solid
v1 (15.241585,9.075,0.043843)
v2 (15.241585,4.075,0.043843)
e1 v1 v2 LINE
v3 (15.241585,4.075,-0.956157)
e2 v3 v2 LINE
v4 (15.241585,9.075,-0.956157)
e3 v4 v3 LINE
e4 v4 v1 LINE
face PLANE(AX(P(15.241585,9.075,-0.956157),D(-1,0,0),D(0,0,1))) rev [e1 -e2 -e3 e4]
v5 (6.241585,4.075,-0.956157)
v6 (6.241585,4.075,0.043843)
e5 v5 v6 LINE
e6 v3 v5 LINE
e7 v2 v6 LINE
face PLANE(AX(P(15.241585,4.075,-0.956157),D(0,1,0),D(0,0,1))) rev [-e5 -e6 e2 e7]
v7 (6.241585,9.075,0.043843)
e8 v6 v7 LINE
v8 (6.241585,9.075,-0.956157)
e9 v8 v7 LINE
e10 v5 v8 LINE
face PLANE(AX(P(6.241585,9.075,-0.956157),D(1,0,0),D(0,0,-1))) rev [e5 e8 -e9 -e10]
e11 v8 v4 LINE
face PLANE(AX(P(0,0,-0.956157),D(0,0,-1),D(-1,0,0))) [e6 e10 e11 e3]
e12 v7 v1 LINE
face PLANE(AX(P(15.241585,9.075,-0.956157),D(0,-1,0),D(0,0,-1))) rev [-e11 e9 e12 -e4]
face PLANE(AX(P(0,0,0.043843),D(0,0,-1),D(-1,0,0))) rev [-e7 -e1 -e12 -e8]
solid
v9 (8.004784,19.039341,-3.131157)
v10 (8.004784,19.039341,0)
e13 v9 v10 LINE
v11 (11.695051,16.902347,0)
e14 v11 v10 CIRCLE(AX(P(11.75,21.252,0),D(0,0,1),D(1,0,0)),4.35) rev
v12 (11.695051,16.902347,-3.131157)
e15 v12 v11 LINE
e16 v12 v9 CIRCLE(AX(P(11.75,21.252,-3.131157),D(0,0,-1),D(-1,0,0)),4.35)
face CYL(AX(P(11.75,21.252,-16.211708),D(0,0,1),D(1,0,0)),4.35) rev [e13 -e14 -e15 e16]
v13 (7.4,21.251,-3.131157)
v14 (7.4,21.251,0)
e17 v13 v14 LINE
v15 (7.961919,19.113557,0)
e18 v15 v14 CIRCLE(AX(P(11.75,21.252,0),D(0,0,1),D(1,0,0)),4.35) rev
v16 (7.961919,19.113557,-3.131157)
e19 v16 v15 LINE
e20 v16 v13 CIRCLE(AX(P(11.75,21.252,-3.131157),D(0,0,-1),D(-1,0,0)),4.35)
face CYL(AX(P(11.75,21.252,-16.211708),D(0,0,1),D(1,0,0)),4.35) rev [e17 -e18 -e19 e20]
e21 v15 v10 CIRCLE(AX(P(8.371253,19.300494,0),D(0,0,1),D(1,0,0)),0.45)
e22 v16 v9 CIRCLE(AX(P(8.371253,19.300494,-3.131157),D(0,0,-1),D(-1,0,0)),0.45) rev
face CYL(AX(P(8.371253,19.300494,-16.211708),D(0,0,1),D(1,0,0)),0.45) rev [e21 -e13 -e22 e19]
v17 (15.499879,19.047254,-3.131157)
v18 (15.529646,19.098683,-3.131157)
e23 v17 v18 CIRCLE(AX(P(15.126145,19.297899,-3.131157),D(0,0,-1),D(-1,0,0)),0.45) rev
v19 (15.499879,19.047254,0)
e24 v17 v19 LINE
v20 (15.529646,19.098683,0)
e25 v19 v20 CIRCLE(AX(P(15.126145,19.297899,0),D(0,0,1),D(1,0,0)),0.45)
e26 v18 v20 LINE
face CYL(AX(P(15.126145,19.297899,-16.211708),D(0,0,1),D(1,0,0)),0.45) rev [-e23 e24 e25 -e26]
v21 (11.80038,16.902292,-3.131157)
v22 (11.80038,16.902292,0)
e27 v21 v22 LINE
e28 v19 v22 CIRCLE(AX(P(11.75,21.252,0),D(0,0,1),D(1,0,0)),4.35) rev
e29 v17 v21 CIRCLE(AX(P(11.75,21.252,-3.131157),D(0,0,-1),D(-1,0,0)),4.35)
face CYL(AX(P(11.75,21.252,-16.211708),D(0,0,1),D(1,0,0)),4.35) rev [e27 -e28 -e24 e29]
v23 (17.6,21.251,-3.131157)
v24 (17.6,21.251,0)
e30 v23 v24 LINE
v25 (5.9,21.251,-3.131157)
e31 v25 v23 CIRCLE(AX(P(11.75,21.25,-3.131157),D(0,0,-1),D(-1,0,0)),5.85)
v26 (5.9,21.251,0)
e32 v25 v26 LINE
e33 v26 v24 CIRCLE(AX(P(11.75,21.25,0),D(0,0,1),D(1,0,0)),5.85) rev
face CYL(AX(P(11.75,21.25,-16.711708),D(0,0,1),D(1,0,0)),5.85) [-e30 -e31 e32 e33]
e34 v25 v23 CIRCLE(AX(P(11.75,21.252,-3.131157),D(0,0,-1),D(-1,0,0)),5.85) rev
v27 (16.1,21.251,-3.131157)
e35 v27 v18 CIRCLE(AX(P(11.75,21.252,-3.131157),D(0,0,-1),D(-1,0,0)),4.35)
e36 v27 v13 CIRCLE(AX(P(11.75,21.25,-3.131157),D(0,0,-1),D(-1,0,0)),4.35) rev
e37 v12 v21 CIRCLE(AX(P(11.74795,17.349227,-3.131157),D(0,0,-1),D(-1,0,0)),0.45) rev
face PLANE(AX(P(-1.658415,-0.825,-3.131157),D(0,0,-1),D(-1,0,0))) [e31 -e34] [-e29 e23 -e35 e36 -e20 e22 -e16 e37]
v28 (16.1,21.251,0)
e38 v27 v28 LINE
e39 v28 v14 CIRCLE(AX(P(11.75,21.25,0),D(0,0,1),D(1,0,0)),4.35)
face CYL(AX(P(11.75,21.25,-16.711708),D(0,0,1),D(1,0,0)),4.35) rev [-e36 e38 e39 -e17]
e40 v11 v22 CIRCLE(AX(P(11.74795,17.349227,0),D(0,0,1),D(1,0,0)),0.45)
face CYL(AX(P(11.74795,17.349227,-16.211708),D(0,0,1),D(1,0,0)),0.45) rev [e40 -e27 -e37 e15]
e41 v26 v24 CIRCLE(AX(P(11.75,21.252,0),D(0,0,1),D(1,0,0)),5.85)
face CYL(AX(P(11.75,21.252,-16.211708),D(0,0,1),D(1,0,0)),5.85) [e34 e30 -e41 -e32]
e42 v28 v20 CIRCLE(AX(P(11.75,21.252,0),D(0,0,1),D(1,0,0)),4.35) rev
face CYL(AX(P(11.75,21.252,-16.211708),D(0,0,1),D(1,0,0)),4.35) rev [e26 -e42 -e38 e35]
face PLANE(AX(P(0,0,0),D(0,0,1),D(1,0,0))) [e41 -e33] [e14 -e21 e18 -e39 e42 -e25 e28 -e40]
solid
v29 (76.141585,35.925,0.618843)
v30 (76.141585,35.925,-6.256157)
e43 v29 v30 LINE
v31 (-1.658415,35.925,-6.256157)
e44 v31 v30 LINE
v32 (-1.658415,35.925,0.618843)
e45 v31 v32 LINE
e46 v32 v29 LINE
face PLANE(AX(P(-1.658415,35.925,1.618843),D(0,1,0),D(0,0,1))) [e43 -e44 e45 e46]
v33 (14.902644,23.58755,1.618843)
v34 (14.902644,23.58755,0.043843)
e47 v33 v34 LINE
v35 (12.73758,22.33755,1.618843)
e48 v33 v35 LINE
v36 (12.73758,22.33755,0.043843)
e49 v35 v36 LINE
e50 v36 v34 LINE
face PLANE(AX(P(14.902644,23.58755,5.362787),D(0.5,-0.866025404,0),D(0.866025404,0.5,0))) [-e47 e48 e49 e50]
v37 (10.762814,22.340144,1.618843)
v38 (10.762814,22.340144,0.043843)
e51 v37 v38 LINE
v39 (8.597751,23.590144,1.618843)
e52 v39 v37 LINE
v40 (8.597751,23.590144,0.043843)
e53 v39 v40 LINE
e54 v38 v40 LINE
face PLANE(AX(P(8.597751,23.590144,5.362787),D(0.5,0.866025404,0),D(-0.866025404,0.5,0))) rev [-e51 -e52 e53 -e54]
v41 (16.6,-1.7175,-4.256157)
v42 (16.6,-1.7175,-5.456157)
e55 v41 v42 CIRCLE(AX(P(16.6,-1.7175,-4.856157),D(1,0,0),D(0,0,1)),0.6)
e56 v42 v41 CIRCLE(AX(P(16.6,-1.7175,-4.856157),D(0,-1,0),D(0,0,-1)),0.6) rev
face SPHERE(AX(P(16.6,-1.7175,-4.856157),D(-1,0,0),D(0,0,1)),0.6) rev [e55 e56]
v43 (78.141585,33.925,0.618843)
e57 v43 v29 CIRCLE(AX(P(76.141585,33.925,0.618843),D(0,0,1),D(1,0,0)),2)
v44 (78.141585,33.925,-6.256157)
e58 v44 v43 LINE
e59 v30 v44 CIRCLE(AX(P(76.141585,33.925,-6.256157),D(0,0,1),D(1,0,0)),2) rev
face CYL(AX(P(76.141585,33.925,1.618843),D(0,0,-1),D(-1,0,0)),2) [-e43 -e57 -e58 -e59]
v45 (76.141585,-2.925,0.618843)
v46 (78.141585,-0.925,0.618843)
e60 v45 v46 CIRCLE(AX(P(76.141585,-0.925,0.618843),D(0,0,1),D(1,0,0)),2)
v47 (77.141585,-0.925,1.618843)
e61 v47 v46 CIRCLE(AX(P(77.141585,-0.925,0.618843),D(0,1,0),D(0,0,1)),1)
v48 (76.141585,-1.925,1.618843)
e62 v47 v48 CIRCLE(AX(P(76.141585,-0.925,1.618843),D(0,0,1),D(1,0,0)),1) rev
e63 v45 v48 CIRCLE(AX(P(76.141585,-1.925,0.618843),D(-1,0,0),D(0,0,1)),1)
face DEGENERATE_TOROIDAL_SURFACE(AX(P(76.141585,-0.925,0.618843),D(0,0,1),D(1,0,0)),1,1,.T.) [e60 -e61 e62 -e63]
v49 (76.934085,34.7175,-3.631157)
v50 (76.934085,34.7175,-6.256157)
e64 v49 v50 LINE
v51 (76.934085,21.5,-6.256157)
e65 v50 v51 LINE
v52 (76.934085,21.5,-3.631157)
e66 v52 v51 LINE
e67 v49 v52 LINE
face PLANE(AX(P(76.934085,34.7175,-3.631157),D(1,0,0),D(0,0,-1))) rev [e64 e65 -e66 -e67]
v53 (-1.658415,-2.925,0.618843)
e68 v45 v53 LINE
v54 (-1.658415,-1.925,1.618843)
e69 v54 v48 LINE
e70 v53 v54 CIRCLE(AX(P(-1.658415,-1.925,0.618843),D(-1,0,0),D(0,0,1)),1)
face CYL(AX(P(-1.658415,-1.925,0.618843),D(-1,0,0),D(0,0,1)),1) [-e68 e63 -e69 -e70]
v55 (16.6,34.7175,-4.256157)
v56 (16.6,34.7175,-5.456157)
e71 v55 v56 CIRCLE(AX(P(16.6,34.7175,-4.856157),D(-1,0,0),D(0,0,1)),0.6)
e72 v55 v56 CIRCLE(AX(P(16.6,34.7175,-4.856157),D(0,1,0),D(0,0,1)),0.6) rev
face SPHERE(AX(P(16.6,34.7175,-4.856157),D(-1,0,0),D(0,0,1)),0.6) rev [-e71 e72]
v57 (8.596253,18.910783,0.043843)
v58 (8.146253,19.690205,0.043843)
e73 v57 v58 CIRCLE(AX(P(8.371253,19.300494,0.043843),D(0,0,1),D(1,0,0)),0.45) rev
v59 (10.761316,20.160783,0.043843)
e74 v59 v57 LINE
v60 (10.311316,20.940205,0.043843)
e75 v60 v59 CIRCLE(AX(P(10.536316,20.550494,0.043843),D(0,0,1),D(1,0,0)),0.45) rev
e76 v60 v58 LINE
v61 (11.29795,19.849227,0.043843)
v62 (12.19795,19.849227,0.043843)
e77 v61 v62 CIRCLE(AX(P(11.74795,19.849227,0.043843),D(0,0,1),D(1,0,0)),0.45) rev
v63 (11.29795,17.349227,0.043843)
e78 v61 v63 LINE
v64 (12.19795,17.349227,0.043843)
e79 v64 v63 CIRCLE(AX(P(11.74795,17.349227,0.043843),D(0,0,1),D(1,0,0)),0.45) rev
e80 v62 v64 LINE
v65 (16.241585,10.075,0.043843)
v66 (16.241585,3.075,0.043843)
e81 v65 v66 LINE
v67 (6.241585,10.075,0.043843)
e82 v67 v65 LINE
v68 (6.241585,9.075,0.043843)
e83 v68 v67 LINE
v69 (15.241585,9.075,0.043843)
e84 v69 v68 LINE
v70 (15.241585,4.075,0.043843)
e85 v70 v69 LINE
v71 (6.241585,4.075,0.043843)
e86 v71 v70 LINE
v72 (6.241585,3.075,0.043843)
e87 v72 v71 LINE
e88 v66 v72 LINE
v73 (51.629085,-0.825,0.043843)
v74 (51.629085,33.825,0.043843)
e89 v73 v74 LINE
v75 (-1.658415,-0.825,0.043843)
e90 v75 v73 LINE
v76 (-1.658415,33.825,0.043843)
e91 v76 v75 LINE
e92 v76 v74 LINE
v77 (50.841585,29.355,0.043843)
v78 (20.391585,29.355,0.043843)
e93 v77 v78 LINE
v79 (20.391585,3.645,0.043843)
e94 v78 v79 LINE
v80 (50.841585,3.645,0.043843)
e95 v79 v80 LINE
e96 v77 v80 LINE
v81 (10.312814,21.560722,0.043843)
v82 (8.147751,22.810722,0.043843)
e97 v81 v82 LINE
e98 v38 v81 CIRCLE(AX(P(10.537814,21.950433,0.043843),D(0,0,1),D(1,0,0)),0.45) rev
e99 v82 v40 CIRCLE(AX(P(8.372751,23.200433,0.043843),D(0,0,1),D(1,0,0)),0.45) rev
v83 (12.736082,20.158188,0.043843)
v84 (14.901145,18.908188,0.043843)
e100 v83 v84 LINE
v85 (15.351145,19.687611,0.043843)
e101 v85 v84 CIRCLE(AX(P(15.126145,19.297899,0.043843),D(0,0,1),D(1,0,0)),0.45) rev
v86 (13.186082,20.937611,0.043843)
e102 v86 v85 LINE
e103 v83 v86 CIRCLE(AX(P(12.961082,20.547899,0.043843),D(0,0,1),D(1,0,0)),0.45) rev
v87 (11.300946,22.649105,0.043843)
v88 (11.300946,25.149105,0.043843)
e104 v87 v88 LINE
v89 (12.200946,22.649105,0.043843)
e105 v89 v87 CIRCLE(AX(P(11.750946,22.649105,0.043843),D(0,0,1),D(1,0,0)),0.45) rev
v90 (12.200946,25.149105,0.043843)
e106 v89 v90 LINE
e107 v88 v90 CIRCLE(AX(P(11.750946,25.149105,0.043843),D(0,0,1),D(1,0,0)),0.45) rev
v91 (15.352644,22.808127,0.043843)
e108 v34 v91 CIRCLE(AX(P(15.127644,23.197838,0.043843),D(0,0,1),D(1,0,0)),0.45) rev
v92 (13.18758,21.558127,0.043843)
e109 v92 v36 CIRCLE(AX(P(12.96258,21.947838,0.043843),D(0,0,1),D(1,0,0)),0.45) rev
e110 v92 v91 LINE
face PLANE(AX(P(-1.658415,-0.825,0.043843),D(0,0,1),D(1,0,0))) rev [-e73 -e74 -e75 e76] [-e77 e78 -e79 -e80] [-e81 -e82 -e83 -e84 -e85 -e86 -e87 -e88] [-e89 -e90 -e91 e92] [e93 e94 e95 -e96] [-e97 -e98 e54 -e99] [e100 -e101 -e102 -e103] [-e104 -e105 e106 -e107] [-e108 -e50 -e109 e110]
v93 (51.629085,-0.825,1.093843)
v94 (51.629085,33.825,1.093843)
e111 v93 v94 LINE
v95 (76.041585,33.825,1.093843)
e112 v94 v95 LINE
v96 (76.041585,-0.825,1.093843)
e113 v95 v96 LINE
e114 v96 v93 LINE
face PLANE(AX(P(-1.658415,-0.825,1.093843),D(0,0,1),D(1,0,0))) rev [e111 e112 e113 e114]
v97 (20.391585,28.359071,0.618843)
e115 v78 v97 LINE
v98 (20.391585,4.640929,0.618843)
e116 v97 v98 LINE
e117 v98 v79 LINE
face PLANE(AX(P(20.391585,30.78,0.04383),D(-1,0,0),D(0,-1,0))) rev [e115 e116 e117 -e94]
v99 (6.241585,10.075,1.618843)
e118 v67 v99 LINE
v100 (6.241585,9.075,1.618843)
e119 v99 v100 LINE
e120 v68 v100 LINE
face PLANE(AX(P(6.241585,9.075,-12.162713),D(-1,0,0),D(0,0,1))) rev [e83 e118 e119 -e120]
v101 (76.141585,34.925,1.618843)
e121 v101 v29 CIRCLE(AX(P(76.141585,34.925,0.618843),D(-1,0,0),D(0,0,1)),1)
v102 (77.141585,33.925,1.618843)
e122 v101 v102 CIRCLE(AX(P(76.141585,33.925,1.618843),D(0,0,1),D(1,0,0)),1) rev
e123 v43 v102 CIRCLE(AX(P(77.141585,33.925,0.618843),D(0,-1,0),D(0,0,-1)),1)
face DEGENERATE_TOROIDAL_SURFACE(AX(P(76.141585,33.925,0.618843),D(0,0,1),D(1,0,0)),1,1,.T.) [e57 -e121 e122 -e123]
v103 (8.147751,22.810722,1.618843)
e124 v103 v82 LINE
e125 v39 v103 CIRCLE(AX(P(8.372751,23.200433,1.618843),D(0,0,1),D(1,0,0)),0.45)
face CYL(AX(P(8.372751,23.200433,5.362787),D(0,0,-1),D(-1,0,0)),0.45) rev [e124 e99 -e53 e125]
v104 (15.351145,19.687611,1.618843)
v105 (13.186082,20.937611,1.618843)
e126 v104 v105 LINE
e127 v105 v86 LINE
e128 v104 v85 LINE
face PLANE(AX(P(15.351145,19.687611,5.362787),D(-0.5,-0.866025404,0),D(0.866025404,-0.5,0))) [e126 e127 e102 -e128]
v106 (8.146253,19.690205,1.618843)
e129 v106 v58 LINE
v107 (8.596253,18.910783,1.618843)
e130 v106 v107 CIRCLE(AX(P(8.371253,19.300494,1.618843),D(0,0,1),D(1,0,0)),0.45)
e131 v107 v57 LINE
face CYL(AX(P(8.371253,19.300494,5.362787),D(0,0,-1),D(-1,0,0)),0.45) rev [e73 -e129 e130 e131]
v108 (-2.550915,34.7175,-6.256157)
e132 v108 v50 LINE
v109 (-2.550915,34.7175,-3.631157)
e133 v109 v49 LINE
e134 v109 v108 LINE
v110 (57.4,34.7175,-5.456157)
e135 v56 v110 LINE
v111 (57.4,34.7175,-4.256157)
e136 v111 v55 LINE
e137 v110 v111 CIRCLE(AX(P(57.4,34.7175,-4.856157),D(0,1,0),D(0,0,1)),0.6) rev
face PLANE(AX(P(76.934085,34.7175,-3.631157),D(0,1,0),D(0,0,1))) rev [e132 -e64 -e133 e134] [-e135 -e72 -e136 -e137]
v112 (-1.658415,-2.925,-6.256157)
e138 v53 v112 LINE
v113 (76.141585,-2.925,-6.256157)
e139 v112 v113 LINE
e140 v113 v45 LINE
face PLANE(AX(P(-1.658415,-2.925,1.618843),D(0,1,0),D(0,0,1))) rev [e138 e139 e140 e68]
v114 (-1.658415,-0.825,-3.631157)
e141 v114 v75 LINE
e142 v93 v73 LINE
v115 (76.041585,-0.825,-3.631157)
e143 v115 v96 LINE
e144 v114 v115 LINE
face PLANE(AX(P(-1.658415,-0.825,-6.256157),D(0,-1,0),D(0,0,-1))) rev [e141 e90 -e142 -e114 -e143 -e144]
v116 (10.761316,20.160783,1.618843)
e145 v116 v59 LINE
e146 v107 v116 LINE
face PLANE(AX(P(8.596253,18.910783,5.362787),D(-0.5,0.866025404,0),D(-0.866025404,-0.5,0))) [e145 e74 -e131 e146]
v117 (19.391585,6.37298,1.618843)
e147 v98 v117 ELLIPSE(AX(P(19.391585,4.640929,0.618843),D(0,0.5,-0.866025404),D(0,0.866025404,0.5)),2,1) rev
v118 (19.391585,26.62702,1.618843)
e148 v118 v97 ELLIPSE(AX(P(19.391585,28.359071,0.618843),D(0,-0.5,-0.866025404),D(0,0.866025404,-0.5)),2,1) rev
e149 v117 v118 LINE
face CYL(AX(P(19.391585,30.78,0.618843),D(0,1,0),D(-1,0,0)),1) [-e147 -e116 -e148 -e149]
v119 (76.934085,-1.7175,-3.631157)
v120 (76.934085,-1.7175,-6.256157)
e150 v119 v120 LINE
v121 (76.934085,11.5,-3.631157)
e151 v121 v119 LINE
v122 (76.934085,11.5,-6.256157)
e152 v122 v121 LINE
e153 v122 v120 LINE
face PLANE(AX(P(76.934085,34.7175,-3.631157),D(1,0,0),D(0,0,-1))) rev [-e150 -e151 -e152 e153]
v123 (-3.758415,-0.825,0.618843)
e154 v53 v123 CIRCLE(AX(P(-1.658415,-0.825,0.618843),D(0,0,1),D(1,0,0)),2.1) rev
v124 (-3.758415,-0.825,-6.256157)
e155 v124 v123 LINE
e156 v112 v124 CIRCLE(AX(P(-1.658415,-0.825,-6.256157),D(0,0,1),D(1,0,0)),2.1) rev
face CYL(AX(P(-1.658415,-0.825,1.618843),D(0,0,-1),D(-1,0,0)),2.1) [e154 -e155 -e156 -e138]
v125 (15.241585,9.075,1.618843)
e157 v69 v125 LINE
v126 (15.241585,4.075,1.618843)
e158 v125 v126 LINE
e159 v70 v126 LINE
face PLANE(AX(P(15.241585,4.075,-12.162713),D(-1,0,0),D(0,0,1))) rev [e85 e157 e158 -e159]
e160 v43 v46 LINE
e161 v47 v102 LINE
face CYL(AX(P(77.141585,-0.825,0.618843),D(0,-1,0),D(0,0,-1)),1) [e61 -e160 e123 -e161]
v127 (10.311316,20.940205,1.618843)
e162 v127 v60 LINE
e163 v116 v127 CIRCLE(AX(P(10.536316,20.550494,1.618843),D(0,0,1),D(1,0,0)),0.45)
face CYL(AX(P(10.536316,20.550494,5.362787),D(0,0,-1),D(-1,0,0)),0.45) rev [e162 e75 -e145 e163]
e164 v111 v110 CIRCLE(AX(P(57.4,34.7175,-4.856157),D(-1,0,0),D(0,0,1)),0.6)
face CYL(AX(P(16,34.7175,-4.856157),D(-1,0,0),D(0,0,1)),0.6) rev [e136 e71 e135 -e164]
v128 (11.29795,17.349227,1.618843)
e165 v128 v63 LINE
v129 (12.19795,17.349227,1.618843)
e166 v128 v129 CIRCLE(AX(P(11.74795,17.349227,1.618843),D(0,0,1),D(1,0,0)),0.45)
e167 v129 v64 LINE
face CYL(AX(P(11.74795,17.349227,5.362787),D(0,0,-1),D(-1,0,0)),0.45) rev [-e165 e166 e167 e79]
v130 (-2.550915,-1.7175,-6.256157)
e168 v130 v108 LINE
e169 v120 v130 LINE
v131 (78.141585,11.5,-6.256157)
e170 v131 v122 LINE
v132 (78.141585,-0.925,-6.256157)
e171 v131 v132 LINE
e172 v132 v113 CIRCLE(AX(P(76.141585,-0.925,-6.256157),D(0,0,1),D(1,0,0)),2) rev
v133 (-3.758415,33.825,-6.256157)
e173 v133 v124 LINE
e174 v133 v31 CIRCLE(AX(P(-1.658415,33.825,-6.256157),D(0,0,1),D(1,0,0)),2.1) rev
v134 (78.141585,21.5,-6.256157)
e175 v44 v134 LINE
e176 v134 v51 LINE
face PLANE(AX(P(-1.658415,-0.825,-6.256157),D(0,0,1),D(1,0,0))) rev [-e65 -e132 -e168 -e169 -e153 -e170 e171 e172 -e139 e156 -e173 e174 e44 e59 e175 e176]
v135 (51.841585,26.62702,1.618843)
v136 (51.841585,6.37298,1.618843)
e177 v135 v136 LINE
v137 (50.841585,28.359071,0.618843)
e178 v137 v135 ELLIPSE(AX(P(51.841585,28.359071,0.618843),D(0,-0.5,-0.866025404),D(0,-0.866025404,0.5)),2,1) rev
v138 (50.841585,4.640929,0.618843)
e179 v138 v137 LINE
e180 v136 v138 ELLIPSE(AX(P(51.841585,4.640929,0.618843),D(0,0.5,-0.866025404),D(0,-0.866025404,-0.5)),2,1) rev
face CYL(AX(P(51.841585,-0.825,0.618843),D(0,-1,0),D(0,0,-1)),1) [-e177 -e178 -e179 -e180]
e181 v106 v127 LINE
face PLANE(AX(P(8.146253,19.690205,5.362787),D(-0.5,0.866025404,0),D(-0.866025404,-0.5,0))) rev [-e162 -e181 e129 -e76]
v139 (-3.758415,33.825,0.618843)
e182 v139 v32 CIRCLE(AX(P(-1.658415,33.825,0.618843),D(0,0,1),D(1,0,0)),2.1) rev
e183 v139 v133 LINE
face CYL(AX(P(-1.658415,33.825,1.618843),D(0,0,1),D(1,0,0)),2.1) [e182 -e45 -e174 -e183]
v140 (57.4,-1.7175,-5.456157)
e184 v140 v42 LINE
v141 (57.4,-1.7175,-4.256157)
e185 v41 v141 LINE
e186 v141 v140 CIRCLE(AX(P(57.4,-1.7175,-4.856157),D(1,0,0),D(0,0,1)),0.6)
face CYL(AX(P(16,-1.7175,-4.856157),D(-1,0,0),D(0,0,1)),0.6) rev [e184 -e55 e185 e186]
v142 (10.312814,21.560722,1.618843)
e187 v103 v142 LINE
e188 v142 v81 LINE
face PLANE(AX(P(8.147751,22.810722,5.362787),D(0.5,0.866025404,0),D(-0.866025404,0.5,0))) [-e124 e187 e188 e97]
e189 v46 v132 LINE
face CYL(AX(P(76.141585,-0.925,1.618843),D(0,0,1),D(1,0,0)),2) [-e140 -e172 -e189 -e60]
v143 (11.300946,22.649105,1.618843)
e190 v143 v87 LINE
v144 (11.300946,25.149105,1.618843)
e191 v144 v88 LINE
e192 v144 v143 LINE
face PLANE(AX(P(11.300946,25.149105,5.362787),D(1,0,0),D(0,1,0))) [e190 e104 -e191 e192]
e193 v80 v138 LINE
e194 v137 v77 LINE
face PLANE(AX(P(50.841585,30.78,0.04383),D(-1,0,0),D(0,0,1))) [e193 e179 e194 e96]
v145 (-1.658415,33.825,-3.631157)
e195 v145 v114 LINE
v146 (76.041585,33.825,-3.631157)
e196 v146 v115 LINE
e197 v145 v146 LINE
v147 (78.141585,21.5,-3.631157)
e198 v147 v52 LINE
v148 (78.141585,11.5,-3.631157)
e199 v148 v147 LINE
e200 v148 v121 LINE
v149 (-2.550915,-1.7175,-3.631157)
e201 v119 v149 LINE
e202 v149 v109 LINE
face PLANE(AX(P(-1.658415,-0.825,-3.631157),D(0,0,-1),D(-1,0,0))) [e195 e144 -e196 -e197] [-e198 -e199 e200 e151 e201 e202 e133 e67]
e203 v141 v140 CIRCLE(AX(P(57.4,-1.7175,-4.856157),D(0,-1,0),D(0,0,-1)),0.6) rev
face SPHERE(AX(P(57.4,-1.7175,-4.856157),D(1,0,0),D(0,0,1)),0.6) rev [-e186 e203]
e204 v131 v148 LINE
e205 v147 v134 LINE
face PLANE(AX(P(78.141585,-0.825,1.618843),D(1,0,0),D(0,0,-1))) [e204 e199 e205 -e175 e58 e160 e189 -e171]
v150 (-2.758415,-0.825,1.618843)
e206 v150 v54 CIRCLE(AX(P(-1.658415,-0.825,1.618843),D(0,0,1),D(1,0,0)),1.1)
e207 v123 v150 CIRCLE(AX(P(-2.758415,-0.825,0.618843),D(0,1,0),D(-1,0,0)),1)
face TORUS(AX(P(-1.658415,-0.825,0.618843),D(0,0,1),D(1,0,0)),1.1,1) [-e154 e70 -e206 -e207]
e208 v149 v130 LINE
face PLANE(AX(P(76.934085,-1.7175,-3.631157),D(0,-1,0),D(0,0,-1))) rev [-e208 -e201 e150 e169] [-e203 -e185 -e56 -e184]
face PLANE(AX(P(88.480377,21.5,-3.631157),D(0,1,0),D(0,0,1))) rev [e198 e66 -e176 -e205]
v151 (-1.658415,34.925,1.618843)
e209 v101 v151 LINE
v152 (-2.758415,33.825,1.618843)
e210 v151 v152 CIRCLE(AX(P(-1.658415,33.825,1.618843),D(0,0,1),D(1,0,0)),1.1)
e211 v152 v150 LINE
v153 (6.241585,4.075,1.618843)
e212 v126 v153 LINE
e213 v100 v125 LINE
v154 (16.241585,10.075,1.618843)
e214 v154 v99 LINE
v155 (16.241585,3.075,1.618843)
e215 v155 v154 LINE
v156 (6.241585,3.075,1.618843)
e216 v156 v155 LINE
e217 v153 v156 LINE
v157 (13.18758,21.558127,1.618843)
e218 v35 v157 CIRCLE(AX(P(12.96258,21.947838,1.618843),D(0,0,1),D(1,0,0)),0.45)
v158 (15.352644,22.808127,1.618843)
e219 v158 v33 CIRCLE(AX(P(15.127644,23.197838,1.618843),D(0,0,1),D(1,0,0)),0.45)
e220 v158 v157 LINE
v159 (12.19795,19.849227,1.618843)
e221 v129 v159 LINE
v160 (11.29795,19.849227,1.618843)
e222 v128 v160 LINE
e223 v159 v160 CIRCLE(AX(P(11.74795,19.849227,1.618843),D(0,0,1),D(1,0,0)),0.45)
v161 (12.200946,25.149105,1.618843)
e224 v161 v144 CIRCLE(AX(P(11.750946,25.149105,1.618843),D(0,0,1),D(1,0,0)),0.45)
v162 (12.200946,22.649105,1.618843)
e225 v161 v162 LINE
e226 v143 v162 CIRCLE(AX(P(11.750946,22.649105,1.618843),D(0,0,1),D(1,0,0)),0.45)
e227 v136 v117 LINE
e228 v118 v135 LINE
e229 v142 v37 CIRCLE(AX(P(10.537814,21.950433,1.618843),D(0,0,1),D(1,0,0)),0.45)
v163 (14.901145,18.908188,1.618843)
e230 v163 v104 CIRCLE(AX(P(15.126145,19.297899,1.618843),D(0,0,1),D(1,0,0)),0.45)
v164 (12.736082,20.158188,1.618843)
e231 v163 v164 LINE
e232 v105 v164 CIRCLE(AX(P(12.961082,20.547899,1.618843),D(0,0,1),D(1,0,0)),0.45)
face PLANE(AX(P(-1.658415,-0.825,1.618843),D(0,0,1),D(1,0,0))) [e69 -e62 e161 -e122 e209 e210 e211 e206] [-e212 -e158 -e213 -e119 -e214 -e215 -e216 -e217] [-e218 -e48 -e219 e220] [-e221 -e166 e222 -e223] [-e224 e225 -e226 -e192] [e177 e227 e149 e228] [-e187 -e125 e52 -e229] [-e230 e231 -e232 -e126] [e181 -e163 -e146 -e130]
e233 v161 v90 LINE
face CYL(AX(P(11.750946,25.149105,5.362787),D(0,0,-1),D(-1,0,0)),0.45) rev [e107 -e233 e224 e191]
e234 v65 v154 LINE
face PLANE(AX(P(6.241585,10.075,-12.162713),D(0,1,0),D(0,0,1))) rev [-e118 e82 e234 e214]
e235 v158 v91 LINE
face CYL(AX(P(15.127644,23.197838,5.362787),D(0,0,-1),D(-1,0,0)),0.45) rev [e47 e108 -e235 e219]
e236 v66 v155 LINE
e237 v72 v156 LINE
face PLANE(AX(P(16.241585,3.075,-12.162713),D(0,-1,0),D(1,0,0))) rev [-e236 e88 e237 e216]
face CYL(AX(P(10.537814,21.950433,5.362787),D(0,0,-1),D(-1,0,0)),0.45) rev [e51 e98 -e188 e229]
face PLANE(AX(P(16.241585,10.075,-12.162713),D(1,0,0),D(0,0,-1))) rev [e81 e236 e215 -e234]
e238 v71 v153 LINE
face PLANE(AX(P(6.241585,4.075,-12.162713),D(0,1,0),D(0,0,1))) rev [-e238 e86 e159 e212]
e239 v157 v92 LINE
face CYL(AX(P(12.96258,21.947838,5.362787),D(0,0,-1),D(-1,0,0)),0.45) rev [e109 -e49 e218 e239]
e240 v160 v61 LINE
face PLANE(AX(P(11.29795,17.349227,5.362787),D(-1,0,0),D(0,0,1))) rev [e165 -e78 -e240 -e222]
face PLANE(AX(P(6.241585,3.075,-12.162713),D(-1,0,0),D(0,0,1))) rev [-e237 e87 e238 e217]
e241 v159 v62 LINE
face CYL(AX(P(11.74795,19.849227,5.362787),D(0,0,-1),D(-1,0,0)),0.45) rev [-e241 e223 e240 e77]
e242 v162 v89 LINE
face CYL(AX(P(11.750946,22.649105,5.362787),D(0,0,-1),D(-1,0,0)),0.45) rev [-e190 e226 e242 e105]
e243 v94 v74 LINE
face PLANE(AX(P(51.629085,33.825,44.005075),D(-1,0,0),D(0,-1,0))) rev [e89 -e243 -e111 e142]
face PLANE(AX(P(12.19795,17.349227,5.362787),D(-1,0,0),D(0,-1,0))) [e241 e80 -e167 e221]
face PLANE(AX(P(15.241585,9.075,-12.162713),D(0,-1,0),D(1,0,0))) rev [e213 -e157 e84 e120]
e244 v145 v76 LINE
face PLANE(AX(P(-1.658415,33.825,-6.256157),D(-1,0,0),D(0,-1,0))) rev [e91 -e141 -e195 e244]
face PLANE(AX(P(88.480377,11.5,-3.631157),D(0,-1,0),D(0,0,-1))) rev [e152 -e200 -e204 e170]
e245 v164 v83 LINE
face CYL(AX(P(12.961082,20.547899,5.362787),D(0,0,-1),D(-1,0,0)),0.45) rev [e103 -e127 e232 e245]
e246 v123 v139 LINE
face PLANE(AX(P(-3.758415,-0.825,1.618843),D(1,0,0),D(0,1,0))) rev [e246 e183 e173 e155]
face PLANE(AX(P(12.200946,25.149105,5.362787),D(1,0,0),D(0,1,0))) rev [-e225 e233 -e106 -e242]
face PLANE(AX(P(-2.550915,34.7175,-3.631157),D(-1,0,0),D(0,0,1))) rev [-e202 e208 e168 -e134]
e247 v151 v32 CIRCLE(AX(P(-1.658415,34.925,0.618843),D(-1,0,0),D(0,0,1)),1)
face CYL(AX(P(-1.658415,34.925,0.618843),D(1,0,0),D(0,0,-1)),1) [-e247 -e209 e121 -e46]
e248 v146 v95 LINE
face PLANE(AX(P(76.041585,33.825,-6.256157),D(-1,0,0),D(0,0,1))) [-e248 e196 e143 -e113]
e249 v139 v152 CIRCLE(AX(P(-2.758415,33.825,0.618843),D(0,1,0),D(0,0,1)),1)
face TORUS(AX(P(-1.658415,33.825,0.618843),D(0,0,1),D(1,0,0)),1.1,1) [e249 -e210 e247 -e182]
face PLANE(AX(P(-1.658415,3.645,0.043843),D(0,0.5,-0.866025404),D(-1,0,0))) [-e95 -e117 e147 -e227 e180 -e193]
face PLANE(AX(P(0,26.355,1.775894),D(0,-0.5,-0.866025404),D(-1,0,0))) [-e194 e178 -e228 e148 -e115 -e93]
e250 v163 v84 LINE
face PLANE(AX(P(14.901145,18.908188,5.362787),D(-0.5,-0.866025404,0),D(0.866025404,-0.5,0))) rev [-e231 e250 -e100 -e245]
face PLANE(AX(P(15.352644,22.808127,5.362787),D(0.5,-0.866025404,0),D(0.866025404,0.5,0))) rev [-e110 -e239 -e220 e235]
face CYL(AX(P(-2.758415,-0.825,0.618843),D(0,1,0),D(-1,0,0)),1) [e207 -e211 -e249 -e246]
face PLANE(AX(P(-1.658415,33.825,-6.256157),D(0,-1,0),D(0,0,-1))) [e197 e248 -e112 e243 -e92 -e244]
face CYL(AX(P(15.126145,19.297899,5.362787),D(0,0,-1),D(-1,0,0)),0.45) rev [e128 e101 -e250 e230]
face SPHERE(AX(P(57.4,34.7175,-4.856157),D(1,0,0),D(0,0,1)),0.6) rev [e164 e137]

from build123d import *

# Parameters (mm, degrees)
SKIZZE1_W                            = 74
SKIZZE1_H                            = 33
AUFSATZ_LINEAR_AUSTRAGEN5_DEPTH      = 1.5
SCHNITT_LINEAR_AUSTRAGEN1_DEPTH      = 82.038571063
SCHNITT_LINEAR_AUSTRAGEN1_DEPTH_BACK = 82.038571063
SKIZZE1_10_W                         = 29
SKIZZE1_10_H                         = 27.2
SKIZZE1_23_W                         = 78
SKIZZE1_23_H                         = 37
SKIZZE1_23_W_2                       = 74
SKIZZE1_23_H_2                       = 33
AUFSATZ_LINEAR_AUSTRAGEN7_DEPTH      = 6
SKIZZE1_24_W                         = 78
SKIZZE1_24_H                         = 37
SKIZZE1_24_W_2                       = 74
SKIZZE1_24_H_2                       = 33
AUFSATZ_LINEAR_AUSTRAGEN8_DEPTH      = 1.5
SKIZZE13_W                           = 23.25
SKIZZE13_H                           = 33
SCHNITT_LINEAR_AUSTRAGEN10_DEPTH     = 1
SKIZZE14_W                           = 29
SKIZZE14_H                           = 1.5
SCHNITT_LINEAR_AUSTRAGEN11_DEPTH     = 8
SKIZZE16_W                           = 75.7
SKIZZE16_H                           = 34.7
SCHNITT_LINEAR_AUSTRAGEN12_DEPTH     = 2.5
VERRUNDUNG7_R                        = 2
SKALIEREN1_SCALE                     = 1.05
VERRUNDUNG10_R                       = 1
SKIZZE21_W                           = 30.828150055
SKIZZE21_H                           = 1.575
AUFSATZ_LINEAR_AUSTRAGEN14_DEPTH     = 6
FASE1_SIZE                           = 3
FASE1_SIZE_2                         = 1.732050808
SPIEGELN2_START                      = 20.391584861
SPIEGELN2_DEPTH                      = 30.45
VERRUNDUNG11_R                       = 1
VERRUNDUNG12_R                       = 2
SKIZZE23_W                           = 2.625
SKIZZE23_H                           = 10
SCHNITT_LINEAR_AUSTRAGEN13_DEPTH     = 1.2075
SCHNITT_LINEAR_AUSTRAGEN14_DEPTH     = 1.575
SKIZZE29_W                           = 9
SKIZZE29_H                           = 5
AUFSATZ_LINEAR_AUSTRAGEN16_DEPTH     = 1
SCHNITT_LINEAR_AUSTRAGEN16_DEPTH     = 1.618842947
AUFSATZ_LINEAR_AUSTRAGEN17_DEPTH     = 3.131157053
AUFSATZ_LINEAR_START                 = -3.131157053
AUFSATZ_LINEAR_AUSTRAGEN18_DEPTH     = 3.131157053


# Read off the part's stored shape, not the designer's step: Spiegeln2
with BuildPart() as part:
    # Skizze1 → Aufsatz-Linear austragen5 (new body)
    with BuildSketch(Plane.XY):
        with Locations((37, 16.5)):
            Rectangle(SKIZZE1_W, SKIZZE1_H)
    extrude(amount=AUFSATZ_LINEAR_AUSTRAGEN5_DEPTH)

    # Skizze1<10> → Schnitt-Linear austragen1 (cut, two sides: drawn at the far end of the back side and taken through both)
    with BuildSketch(Plane.XY.offset(-SCHNITT_LINEAR_AUSTRAGEN1_DEPTH_BACK)):
        with Locations((35.5, 16.5)):
            Rectangle(SKIZZE1_10_W, SKIZZE1_10_H)
    extrude(amount=SCHNITT_LINEAR_AUSTRAGEN1_DEPTH + SCHNITT_LINEAR_AUSTRAGEN1_DEPTH_BACK, mode=Mode.SUBTRACT)



with BuildPart() as body_2:
    # Skizze1<23> → Aufsatz-Linear austragen7 (new body)
    with BuildSketch(Plane.XY):
        with Locations((37, 16.5)):
            Rectangle(SKIZZE1_23_W, SKIZZE1_23_H)
        with Locations((37, 16.5)):
            Rectangle(SKIZZE1_23_W_2, SKIZZE1_23_H_2, mode=Mode.SUBTRACT)
    extrude(amount=-AUFSATZ_LINEAR_AUSTRAGEN7_DEPTH)


with BuildPart() as part_1:
    add(part.part)

    add(body_2.part)  # Aufsatz-Linear austragen8 merges body 2
    # Skizze1<24> → Aufsatz-Linear austragen8 (add)
    with BuildSketch(Plane.XY):
        with Locations((37, 16.5)):
            Rectangle(SKIZZE1_24_W, SKIZZE1_24_H)
        with Locations((37, 16.5)):
            Rectangle(SKIZZE1_24_W_2, SKIZZE1_24_H_2, mode=Mode.SUBTRACT)
    extrude(amount=AUFSATZ_LINEAR_AUSTRAGEN8_DEPTH)

    # Skizze13 → Schnitt-Linear austragen10 (cut)
    with BuildSketch(Plane(origin=(0, 0, 0), x_dir=(-1, 0, 0), z_dir=(0, 0, -1))):
        with Locations((-62.375, 16.5)):
            Rectangle(SKIZZE13_W, SKIZZE13_H)
    extrude(amount=-SCHNITT_LINEAR_AUSTRAGEN10_DEPTH, mode=Mode.SUBTRACT)

    # Skizze14 → Schnitt-Linear austragen11 (cut)
    with BuildSketch(Plane(origin=(0, 0, 0), x_dir=(-1, 0, 0), z_dir=(0, 0, -1))):
        with Locations((-35.5, 30.85)):
            Rectangle(SKIZZE14_W, SKIZZE14_H)
        with Locations((-35.5, 2.15)):
            Rectangle(SKIZZE14_W, SKIZZE14_H)
    extrude(amount=-SCHNITT_LINEAR_AUSTRAGEN11_DEPTH, mode=Mode.SUBTRACT)

    # Skizze16 → Schnitt-Linear austragen12 (cut)
    with BuildSketch(Plane(origin=(0, 0, -6), x_dir=(-1, 0, 0), z_dir=(0, 0, -1))):
        with Locations((-37, 16.5)):
            Rectangle(SKIZZE16_W, SKIZZE16_H)
    extrude(amount=-SCHNITT_LINEAR_AUSTRAGEN12_DEPTH, mode=Mode.SUBTRACT)

    # Verrundung7
    verrundung7_edges = [part_1.edges().sort_by_distance(p)[0] for p in [
        (-2, 35, -2.25),
        (-2, -2, -2.25),
    ]]
    fillet(verrundung7_edges, radius=VERRUNDUNG7_R)


with BuildPart() as part_2:
    # Skalieren1: scaled about (33.168302775, 16.5, -0.876858937)
    add(part_1.part.scale(SKALIEREN1_SCALE).moved(Location((-1.658415139, -0.825, 0.043842947))))

    # Verrundung10
    verrundung10_edges = [part_2.edges().sort_by_distance(p)[0] for p in [
        (-3.758415139, 16.5, 1.618842947),
        (38.241584861, 35.925, 1.618842947),
        (38.241584861, -2.925, 1.618842947),
        (-3.143339379, -2.30992424, 1.618842947),
        (-3.143339379, 35.30992424, 1.618842947),
        (78.141584861, 16.5, 1.618842947),
    ]]
    fillet(verrundung10_edges, radius=VERRUNDUNG10_R)

    # Skizze21 → Aufsatz-Linear austragen14 (add)
    with BuildSketch(Plane.XZ.offset(-32.355)):
        with Locations((35.805659889, 0.831342947)):
            Rectangle(SKIZZE21_W, SKIZZE21_H)
    extrude(amount=AUFSATZ_LINEAR_AUSTRAGEN14_DEPTH)

    # Fase1
    # the kernel refuses this chamfer: 3, 1.732050808 mm, written as the material it takes off along each edge
    with BuildSketch(Plane(origin=(50.841584861, 26.355, 0.043842947), x_dir=(0, 0.9998132206221872, -0.019326765613771852), z_dir=(-1, 0, 0))) as fase1_piece_1:
        Polygon((FASE1_SIZE * 0.999813220622, -FASE1_SIZE * 0.0193267656127), (-FASE1_SIZE_2 * 0.019326765609, -FASE1_SIZE_2 * 0.999813220373), (0, 0), align=None)
    extrude(amount=30.45, mode=Mode.SUBTRACT)

    # Spiegeln2 outline → Spiegeln2 (add)
    with BuildSketch(Plane.YZ.offset(SPIEGELN2_START)):
        Polygon((0.645, 0.043842947), (3.645, 0.043842947), (6.372980022, 1.618842947), (0.645, 1.618842947), align=None)
    extrude(amount=SPIEGELN2_DEPTH)

    # Verrundung11
    verrundung11_edges = [part_2.edges().sort_by_distance(p)[0] for p in [
        (50.841584861, 16.5, 1.618842947),
        (20.391584861, 16.5, 1.618842947),
    ]]
    fillet(verrundung11_edges, radius=VERRUNDUNG11_R)

    # Verrundung12
    # the kernel refuses this fillet: 2 mm, written as the material it takes off along each edge
    with BuildSketch(Plane(origin=(76.141584861, -0.925, 1.618842947), x_dir=(0, -1, 0), z_dir=(-1, 0, 0))) as verrundung12_piece_1:
        with BuildLine():
            CenterArc((1, -1), 1, 0, 90)
            Line((2, -1), (2, 0))
            Line((2, 0), (1, 0))
        make_face()
    revolve(axis=Axis((76.141584861, -0.925, 1.618842947), (0, 0, 1)), revolution_arc=90, mode=Mode.SUBTRACT)
    with BuildSketch(Plane(origin=(76.141584861, 33.925, 1.618842947), x_dir=(1, 0, 0), z_dir=(0, -1, 0))) as verrundung12_piece_2:
        with BuildLine():
            CenterArc((1, -1), 1, 0, 90)
            Line((2, -1), (2, 0))
            Line((2, 0), (1, 0))
        make_face()
    revolve(axis=Axis((76.141584861, 33.925, 1.618842947), (0, 0, 1)), revolution_arc=90, mode=Mode.SUBTRACT)
    with BuildSketch(Plane(origin=(78.141584861, -2.925, 1.618842947), x_dir=(0, 1, 0), z_dir=(0, 0, -1))) as verrundung12_piece_3:
        with BuildLine():
            CenterArc((VERRUNDUNG12_R, -VERRUNDUNG12_R), VERRUNDUNG12_R, 90, 90)
            Line((0, -VERRUNDUNG12_R), (0, 0))
            Line((0, 0), (VERRUNDUNG12_R, 0))
        make_face()
    extrude(amount=12.875, mode=Mode.SUBTRACT)
    with BuildSketch(Plane(origin=(78.141584861, 35.925, 1.618842947), x_dir=(0, -1, 0), z_dir=(0, 0, -1))) as verrundung12_piece_4:
        with BuildLine():
            CenterArc((VERRUNDUNG12_R, VERRUNDUNG12_R), VERRUNDUNG12_R, 180, 90)
            Line((0, VERRUNDUNG12_R), (0, 0))
            Line((0, 0), (VERRUNDUNG12_R, 0))
        make_face()
    extrude(amount=12.875, mode=Mode.SUBTRACT)

    # Skizze23 → Schnitt-Linear austragen13 (cut)
    with BuildSketch(Plane.ZY.offset(-76.934084861)):
        with Locations((-4.943657053, 16.5)):
            Rectangle(SKIZZE23_W, SKIZZE23_H)
    extrude(amount=-SCHNITT_LINEAR_AUSTRAGEN13_DEPTH, mode=Mode.SUBTRACT)

    # Skizze26 → Schnitt-Rotation1 (revolve, cut)
    with BuildSketch(Plane.XZ.offset(-34.7175)):
        with BuildLine():
            Line((16, -4.856157053), (37, -4.856157053))
            Line((37, -4.856157053), (37, -4.256157053))
            Line((37, -4.256157053), (16.6, -4.256157053))
            ThreePointArc((16.6, -4.256157053), (16.175735931, -4.431892984), (16, -4.856157053))
        make_face()
    schnitt_rotation1 = revolve(axis=Axis((16, 34.7175, -4.856157053), (1, 0, 0)), mode=Mode.SUBTRACT)

    # Spiegeln3: Schnitt-Rotation1 across plane
    add(schnitt_rotation1.mirror(Plane.ZY.offset(-37)), mode=Mode.SUBTRACT)

    # Spiegeln4: Schnitt-Rotation1 across plane
    add(schnitt_rotation1.mirror(Plane.ZX.offset(16.5)), mode=Mode.SUBTRACT)

    # Spiegeln4 copy 1 sketch → Spiegeln4 copy 1 (revolve, cut)
    with BuildSketch(Plane(origin=(74, -1.7175, 0), x_dir=(-1, 0, 0), z_dir=(0, 1, 0))):
        with BuildLine():
            Line((16, -4.856157053), (37, -4.856157053))
            Line((37, -4.856157053), (37, -4.256157053))
            Line((37, -4.256157053), (16.6, -4.256157053))
            ThreePointArc((16.6, -4.256157053), (16.175735931, -4.431892984), (16, -4.856157053))
        make_face()
    revolve(axis=Axis((58, -1.7175, -4.856157053), (-1, 0, 0)), mode=Mode.SUBTRACT)

    # Skizze27 → Schnitt-Linear austragen14 (cut)
    with BuildSketch(Plane.XY.offset(1.618842947)):
        Polygon((6.241584861, 10.075), (16.241584861, 10.075), (16.241584861, 3.075), (6.241584861, 3.075), (6.241584861, 4.075), (15.241584861, 4.075), (15.241584861, 9.075), (6.241584861, 9.075), align=None)
    extrude(amount=-SCHNITT_LINEAR_AUSTRAGEN14_DEPTH, mode=Mode.SUBTRACT)

    # Skizze1<36> → Schnitt-Linear austragen16 (cut)
    with BuildSketch(Plane.XY):
        with BuildLine():
            Line((8.597750966, 23.590144421), (10.762814476, 22.340144421))
            ThreePointArc((10.762814476, 22.340144421), (10.927525907, 21.725432989), (10.312814476, 21.560721557))
            Line((10.312814476, 21.560721557), (8.147750966, 22.810721557))
            ThreePointArc((8.147750966, 22.810721557), (7.983039534, 23.425432989), (8.597750966, 23.590144421))
        make_face()
        with BuildLine():
            Line((11.300946332, 25.149105086), (11.300946332, 22.649105086))
            ThreePointArc((11.300946332, 22.649105086), (11.750946332, 22.199105086), (12.200946332, 22.649105086))
            Line((12.200946332, 22.649105086), (12.200946332, 25.149105086))
            ThreePointArc((12.200946332, 25.149105086), (11.750946332, 25.599105086), (11.300946332, 25.149105086))
        make_face()
        with BuildLine():
            Line((14.902643555, 23.587549559), (12.737580045, 22.337549559))
            ThreePointArc((12.737580045, 22.337549559), (12.572868614, 21.722838128), (13.187580045, 21.558126696))
            Line((13.187580045, 21.558126696), (15.352643555, 22.808126696))
            ThreePointArc((15.352643555, 22.808126696), (15.517354987, 23.422838128), (14.902643555, 23.587549559))
        make_face()
        with BuildLine():
            Line((15.351145411, 19.687610505), (13.186081901, 20.937610505))
            ThreePointArc((13.186081901, 20.937610505), (12.57137047, 20.772899073), (12.736081901, 20.158187641))
            Line((12.736081901, 20.158187641), (14.901145411, 18.908187641))
            ThreePointArc((14.901145411, 18.908187641), (15.515856843, 19.072899073), (15.351145411, 19.687610505))
        make_face()
        with BuildLine():
            Line((12.197950045, 17.349226977), (12.197950045, 19.849226977))
            ThreePointArc((12.197950045, 19.849226977), (11.747950045, 20.299226977), (11.297950045, 19.849226977))
            Line((11.297950045, 19.849226977), (11.297950045, 17.349226977))
            ThreePointArc((11.297950045, 17.349226977), (11.747950045, 16.899226977), (12.197950045, 17.349226977))
        make_face()
        with BuildLine():
            Line((8.596252822, 18.910782503), (10.761316332, 20.160782503))
            ThreePointArc((10.761316332, 20.160782503), (10.926027763, 20.775493935), (10.311316332, 20.940205366))
            Line((10.311316332, 20.940205366), (8.146252822, 19.690205366))
            ThreePointArc((8.146252822, 19.690205366), (7.98154139, 19.075493935), (8.596252822, 18.910782503))
        make_face()
    extrude(amount=SCHNITT_LINEAR_AUSTRAGEN16_DEPTH, mode=Mode.SUBTRACT)


with BuildPart() as body_2_2:
    # Skizze29 → Aufsatz-Linear austragen16 (new body)
    with BuildSketch(Plane(origin=(0, 0, 0.043842947), x_dir=(-1, 0, 0), z_dir=(0, 0, -1))):
        with Locations((-10.741584861, 6.575)):
            Rectangle(SKIZZE29_W, SKIZZE29_H)
    extrude(amount=AUFSATZ_LINEAR_AUSTRAGEN16_DEPTH)


with BuildPart() as body_3:
    # Skizze1<38> → Aufsatz-Linear austragen17 (new body)
    with BuildSketch(Plane.XY):
        with BuildLine():
            ThreePointArc((17.6, 21.251), (11.75, 27.100000085), (5.9, 21.251))
            Line((5.9, 21.251), (7.400000115, 21.251))
            ThreePointArc((7.400000115, 21.251), (7.548424305, 22.376615144), (7.983068379, 23.425482972))
            ThreePointArc((7.983068379, 23.425482972), (12.875649235, 25.451834576), (16.099999885, 21.251))
            Line((16.099999885, 21.251), (17.6, 21.251))
        make_face()
    extrude(amount=-AUFSATZ_LINEAR_AUSTRAGEN17_DEPTH)

    # Skizze1<39> → Aufsatz-Linear austragen18 (add)
    with BuildSketch(Plane.XY.offset(AUFSATZ_LINEAR_START)):
        with BuildLine():
            Line((7.400000115, 21.251), (5.9, 21.251))
            ThreePointArc((5.9, 21.251), (11.75, 15.401999915), (17.6, 21.251))
            Line((17.6, 21.251), (16.099999885, 21.251))
            ThreePointArc((16.099999885, 21.251), (15.954866713, 20.137730767), (15.529646414, 19.09868326))
            ThreePointArc((15.529646414, 19.09868326), (15.515612726, 19.07247678), (15.499879375, 19.047254058))
            ThreePointArc((15.499879375, 19.047254058), (13.931904838, 17.48878445), (11.800380036, 16.902291751))
            ThreePointArc((11.800380036, 16.902291751), (11.747713679, 16.899227039), (11.695050571, 16.902347076))
            ThreePointArc((11.695050571, 16.902347076), (9.57009197, 17.487627412), (8.004784464, 19.039340833))
            ThreePointArc((8.004784464, 19.039340833), (7.981580622, 19.075425996), (7.961918578, 19.113556841))
            ThreePointArc((7.961918578, 19.113556841), (7.542951432, 20.145997131), (7.400000115, 21.251))
        make_face()
    extrude(amount=AUFSATZ_LINEAR_AUSTRAGEN18_DEPTH)


solid = Compound([part_2.part, body_2_2.part, body_3.part])
